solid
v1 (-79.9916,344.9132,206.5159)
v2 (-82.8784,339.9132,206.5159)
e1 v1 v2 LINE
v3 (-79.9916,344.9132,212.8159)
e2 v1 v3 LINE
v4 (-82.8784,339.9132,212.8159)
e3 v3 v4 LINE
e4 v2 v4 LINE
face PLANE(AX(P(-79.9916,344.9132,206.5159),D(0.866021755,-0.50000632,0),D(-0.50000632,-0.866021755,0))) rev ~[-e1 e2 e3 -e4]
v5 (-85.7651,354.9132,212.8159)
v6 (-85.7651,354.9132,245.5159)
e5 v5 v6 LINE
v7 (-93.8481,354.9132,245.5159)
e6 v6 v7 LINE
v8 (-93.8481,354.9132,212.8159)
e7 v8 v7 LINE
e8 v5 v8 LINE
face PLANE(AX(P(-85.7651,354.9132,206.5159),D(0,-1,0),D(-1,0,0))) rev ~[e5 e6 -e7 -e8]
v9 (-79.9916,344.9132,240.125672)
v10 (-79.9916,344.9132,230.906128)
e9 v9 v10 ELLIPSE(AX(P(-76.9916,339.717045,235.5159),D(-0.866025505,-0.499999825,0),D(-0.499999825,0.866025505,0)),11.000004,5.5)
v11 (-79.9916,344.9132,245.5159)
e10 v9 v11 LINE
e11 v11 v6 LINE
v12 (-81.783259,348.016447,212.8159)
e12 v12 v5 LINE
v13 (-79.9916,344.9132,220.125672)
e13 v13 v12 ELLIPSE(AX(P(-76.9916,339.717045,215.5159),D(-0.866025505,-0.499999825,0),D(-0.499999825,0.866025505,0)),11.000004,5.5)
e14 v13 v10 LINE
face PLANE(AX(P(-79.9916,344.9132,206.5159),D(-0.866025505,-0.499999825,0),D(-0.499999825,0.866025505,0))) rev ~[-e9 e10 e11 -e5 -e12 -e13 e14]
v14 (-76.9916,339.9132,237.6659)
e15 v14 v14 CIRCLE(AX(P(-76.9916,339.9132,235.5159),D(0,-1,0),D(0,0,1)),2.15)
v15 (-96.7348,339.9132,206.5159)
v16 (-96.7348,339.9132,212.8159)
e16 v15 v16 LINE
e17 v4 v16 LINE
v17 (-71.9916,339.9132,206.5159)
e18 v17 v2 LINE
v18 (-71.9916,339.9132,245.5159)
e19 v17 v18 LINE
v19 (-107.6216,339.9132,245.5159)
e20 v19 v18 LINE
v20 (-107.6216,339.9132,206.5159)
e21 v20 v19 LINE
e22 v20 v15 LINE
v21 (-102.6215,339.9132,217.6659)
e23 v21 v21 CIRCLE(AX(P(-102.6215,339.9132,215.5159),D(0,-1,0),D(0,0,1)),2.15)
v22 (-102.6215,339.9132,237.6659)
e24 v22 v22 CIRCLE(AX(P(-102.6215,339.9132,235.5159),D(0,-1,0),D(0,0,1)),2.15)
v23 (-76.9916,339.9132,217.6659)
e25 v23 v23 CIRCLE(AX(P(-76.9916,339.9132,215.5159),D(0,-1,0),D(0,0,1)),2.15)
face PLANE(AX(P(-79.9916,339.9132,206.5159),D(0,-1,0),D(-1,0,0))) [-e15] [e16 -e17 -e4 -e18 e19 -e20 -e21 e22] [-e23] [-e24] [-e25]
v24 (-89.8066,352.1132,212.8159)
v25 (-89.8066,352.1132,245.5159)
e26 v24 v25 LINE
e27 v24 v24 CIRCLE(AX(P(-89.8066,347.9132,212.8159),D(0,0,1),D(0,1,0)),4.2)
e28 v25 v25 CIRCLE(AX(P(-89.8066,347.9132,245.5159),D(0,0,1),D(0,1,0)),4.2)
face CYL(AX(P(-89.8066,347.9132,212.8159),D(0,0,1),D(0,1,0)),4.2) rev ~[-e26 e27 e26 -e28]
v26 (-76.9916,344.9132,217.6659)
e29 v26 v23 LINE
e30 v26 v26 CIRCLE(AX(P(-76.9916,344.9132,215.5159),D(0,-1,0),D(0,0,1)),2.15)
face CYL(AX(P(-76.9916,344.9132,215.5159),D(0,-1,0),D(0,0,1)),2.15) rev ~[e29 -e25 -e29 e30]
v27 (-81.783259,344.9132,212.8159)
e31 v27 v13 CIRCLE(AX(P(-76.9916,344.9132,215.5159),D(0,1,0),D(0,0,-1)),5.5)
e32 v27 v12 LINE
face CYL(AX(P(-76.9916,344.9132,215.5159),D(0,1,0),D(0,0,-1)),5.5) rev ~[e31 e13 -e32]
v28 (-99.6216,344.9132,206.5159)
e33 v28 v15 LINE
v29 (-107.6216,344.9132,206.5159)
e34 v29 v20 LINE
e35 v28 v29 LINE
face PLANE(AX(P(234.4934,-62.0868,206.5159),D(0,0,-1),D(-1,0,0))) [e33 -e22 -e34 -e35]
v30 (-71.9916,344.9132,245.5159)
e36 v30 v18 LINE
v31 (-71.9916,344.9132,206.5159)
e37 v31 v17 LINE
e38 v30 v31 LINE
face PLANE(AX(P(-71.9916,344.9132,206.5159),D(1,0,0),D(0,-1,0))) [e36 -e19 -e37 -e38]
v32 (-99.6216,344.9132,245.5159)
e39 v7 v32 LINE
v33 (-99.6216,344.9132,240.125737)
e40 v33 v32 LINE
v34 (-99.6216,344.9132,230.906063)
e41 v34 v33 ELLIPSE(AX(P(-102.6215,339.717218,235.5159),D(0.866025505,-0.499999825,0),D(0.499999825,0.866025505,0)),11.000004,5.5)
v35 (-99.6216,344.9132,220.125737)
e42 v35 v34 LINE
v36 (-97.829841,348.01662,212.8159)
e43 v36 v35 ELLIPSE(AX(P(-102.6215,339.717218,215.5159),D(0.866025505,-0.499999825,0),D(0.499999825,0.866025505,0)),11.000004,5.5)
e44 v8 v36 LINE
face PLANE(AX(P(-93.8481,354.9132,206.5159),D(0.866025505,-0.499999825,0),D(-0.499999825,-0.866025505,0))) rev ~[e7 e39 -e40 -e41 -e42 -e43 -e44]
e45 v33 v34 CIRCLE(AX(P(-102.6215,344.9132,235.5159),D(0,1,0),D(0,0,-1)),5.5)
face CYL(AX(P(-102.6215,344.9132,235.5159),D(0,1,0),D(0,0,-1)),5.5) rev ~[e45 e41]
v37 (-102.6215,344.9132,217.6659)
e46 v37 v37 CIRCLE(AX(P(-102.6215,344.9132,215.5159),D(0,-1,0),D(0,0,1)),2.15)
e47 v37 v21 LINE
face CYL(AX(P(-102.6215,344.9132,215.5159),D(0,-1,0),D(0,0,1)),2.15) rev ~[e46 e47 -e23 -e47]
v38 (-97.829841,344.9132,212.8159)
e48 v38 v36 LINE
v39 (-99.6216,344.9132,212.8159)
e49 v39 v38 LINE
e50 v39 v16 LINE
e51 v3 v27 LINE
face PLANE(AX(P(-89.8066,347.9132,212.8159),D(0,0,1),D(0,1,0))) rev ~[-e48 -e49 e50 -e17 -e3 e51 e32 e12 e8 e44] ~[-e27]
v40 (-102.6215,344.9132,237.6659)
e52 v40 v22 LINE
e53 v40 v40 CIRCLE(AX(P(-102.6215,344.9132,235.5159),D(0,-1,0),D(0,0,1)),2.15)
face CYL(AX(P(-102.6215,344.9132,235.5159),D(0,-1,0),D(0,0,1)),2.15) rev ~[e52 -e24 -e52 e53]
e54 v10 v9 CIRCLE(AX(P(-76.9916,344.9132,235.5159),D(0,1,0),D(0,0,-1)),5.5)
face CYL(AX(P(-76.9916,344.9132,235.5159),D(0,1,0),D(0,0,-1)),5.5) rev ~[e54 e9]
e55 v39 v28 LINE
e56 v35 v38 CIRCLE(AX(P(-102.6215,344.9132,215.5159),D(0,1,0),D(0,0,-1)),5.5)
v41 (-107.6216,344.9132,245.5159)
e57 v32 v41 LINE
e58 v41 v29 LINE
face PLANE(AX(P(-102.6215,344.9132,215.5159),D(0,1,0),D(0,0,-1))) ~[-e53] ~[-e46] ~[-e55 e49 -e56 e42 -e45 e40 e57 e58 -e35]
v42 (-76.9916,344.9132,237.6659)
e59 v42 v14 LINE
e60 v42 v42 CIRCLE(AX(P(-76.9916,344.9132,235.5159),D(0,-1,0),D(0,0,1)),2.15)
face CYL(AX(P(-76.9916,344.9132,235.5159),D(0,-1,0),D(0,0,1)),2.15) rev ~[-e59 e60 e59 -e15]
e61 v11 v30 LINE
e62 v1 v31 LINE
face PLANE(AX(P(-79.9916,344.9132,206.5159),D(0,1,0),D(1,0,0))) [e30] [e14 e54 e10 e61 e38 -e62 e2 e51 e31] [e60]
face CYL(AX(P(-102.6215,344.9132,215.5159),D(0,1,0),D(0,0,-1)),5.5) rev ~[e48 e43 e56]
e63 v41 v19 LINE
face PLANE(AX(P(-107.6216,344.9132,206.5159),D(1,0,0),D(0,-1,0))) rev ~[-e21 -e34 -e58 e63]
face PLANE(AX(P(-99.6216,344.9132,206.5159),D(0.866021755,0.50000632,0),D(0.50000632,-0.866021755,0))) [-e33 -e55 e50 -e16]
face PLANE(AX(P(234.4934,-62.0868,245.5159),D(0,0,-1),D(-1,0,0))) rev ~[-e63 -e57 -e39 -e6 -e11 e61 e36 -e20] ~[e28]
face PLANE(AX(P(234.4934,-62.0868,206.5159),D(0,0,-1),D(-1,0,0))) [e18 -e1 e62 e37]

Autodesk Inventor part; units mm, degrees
ref_plane "YZ Plane" through (0, 0, 0) normal (1, 0, 0) x (0, 1, 0)
ref_plane "XZ Plane" through (0, 0, 0) normal (0, 1, 0) x (-1, 0, 0)
ref_plane "Work Plane2" through (234.4934, -62.0868, 206.5159) normal (0, 0, -1) x (-1, 0, 0)
sketch "Sketch3" plane through (234.4934, -62.0868, 206.5159) normal (0, 0, -1) x (-1, 0, 0)
  circle A0 centre (324.3, 410) radius 4 construction
  line L0 (314.485, 407) -> (320.2585, 417)
  line L1 (320.2585, 417) -> (328.3415, 417)
  line L2 (328.3415, 417) -> (334.115, 407)
  line L3 (-385, 402) -> (385, 402) construction
  line L4 (314.485, 407) -> (314.485, 402) construction
  line L5 (334.115, 407) -> (334.115, 402) construction
  line L6 (314.485, 407) -> (306.485, 407)
  line L7 (306.485, 407) -> (306.485, 402)
  line L8 (306.485, 402) -> (314.485, 402)
  line L9 (314.485, 402) -> (314.485, 407) construction
  line L10 (334.115, 407) -> (342.115, 407)
  line L11 (342.115, 407) -> (342.115, 402)
  line L12 (342.115, 402) -> (334.115, 402)
  line L13 (334.115, 402) -> (334.115, 407) construction
  line L14 (314.485, 402) -> (334.115, 402)
  point P0 (234.4934, 62.0868)
  dimension "d19" = 8
  dimension "d20" = 3
  dimension "d21" = 60
  dimension "d22" = 60
  dimension "d24" = 3
  dimension "d25" = 3
  dimension "d26" = 5
  dimension "d27" = 5
  dimension "d28" = 8
  dimension "d29" = 8
ref_plane "Work Plane3" through (-75.5066, 299.1132, 245.5159) normal (0, 0, 1) x (1, 0, 0)
extrude "Extrusion2" add sketch "Sketch3" against normal up to surface (39 mm away)
sketch "Sketch4" plane through (234.4934, -62.0868, 206.5159) normal (0, 0, -1) x (-1, 0, 0)
  point P0 (234.4934, 62.0868)
  point P1 (324.3, 410)
hole "Hole2" at (-89.8066, 347.9132, 206.5159) direction (0, 0, 1) diameter 8.4 end through all counterbore diameter 18 counterbore depth 6.3 clearance for "Hex Head Cap Screw DIN EN 24017" size "M8" standard "DIN"
sketch "Sketch5" plane through (-79.9916, 344.9132, 206.5159) normal (0, 1, 0) x (1, 0, 0)
  line L0 (-119.515, -29) -> (748.485, -29) construction
  line L1 (-119.515, -9) -> (748.485, -9) construction
  line L2 (8, 0) -> (8, -39) construction
  line L3 (-27.6299, 0) -> (-27.6299, -39) construction
  point P0 (79.9916, 206.5159)
  point P1 (3, -29)
  point P2 (-22.6299, -29)
  point P3 (-22.6299, -9)
  point P4 (3, -9)
  dimension "d39" = 5
  dimension "d40" = 5
  dimension "d41" = 5
  dimension "d42" = 5
hole "Hole3" at (-76.9916, 344.9132, 235.5159) at (-102.6215, 344.9132, 235.5159) at (-102.6215, 344.9132, 215.5159) at (-76.9916, 344.9132, 215.5159) direction (0, -1, 0) diameter 4.3 end through all clearance for "Hex Head Cap Screw DIN EN 24017" size "M4" standard "DIN"
sketch "Sketch6" plane through (-79.9916, 344.9132, 206.5159) normal (0, 1, 0) x (1, 0, 0)
  point P0 (79.9916, 206.5159)
  point P1 (3, -29)
  point P2 (-22.6299, -29)
  point P3 (-22.6299, -9)
  point P4 (3, -9)
hole "Hole4" at (-76.9916, 344.9132, 235.5159) at (-102.6215, 344.9132, 235.5159) at (-102.6215, 344.9132, 215.5159) at (-76.9916, 344.9132, 215.5159) direction (0, 1, 0) diameter 11 end through all
sketch "Sketch7" plane through (234.4934, -62.0868, 206.5159) normal (0, 0, -1) x (-1, 0, 0)
  arc A0 (315.4094, 408.601) -> (320.1769, 402) centre (324.3, 410) ccw projected
  line L0 (315.4094, 408.601) -> (314.485, 407) projected
  line L1 (314.485, 407) -> (306.485, 407) projected
  line L2 (306.485, 407) -> (306.485, 402) projected
  line L3 (306.485, 402) -> (320.1769, 402) projected
  arc A1 (328.4231, 402) -> (333.1906, 408.601) centre (324.3, 410) ccw projected
  line L4 (328.4231, 402) -> (342.115, 402) projected
  line L5 (342.115, 402) -> (342.115, 407) projected
  line L6 (342.115, 407) -> (334.115, 407) projected
  line L7 (334.115, 407) -> (333.1906, 408.601) projected
  line L8 (320.2585, 417) -> (314.485, 407) projected
  line L9 (314.485, 407) -> (317.3718, 402)
  line L10 (306.485, 402) -> (342.115, 402) projected
  line L11 (342.115, 407) -> (334.115, 407) projected
  line L12 (334.115, 407) -> (331.2282, 402)
  point P0 (234.4934, 62.0868)
  point P1 (308.4231, 367)
  dimension "d63" = 60
  dimension "d64" = 60
extrude "Extrusion3" cut sketch "Sketch7" against normal up to surface (6.3 mm away) contours A0 L3 L9 L0 | A1 L7 L12 L4
equation "\"d22\" = d21"
equation "\"d24\" = d20"
equation "\"d25\" = d24"
equation "\"d27\" = d26"
equation "\"d29\" = d28"
equation "\"d40\" = d39"
equation "\"d41\" = d39"
equation "\"d42\" = d39"
properties part number "AxleHolder"
